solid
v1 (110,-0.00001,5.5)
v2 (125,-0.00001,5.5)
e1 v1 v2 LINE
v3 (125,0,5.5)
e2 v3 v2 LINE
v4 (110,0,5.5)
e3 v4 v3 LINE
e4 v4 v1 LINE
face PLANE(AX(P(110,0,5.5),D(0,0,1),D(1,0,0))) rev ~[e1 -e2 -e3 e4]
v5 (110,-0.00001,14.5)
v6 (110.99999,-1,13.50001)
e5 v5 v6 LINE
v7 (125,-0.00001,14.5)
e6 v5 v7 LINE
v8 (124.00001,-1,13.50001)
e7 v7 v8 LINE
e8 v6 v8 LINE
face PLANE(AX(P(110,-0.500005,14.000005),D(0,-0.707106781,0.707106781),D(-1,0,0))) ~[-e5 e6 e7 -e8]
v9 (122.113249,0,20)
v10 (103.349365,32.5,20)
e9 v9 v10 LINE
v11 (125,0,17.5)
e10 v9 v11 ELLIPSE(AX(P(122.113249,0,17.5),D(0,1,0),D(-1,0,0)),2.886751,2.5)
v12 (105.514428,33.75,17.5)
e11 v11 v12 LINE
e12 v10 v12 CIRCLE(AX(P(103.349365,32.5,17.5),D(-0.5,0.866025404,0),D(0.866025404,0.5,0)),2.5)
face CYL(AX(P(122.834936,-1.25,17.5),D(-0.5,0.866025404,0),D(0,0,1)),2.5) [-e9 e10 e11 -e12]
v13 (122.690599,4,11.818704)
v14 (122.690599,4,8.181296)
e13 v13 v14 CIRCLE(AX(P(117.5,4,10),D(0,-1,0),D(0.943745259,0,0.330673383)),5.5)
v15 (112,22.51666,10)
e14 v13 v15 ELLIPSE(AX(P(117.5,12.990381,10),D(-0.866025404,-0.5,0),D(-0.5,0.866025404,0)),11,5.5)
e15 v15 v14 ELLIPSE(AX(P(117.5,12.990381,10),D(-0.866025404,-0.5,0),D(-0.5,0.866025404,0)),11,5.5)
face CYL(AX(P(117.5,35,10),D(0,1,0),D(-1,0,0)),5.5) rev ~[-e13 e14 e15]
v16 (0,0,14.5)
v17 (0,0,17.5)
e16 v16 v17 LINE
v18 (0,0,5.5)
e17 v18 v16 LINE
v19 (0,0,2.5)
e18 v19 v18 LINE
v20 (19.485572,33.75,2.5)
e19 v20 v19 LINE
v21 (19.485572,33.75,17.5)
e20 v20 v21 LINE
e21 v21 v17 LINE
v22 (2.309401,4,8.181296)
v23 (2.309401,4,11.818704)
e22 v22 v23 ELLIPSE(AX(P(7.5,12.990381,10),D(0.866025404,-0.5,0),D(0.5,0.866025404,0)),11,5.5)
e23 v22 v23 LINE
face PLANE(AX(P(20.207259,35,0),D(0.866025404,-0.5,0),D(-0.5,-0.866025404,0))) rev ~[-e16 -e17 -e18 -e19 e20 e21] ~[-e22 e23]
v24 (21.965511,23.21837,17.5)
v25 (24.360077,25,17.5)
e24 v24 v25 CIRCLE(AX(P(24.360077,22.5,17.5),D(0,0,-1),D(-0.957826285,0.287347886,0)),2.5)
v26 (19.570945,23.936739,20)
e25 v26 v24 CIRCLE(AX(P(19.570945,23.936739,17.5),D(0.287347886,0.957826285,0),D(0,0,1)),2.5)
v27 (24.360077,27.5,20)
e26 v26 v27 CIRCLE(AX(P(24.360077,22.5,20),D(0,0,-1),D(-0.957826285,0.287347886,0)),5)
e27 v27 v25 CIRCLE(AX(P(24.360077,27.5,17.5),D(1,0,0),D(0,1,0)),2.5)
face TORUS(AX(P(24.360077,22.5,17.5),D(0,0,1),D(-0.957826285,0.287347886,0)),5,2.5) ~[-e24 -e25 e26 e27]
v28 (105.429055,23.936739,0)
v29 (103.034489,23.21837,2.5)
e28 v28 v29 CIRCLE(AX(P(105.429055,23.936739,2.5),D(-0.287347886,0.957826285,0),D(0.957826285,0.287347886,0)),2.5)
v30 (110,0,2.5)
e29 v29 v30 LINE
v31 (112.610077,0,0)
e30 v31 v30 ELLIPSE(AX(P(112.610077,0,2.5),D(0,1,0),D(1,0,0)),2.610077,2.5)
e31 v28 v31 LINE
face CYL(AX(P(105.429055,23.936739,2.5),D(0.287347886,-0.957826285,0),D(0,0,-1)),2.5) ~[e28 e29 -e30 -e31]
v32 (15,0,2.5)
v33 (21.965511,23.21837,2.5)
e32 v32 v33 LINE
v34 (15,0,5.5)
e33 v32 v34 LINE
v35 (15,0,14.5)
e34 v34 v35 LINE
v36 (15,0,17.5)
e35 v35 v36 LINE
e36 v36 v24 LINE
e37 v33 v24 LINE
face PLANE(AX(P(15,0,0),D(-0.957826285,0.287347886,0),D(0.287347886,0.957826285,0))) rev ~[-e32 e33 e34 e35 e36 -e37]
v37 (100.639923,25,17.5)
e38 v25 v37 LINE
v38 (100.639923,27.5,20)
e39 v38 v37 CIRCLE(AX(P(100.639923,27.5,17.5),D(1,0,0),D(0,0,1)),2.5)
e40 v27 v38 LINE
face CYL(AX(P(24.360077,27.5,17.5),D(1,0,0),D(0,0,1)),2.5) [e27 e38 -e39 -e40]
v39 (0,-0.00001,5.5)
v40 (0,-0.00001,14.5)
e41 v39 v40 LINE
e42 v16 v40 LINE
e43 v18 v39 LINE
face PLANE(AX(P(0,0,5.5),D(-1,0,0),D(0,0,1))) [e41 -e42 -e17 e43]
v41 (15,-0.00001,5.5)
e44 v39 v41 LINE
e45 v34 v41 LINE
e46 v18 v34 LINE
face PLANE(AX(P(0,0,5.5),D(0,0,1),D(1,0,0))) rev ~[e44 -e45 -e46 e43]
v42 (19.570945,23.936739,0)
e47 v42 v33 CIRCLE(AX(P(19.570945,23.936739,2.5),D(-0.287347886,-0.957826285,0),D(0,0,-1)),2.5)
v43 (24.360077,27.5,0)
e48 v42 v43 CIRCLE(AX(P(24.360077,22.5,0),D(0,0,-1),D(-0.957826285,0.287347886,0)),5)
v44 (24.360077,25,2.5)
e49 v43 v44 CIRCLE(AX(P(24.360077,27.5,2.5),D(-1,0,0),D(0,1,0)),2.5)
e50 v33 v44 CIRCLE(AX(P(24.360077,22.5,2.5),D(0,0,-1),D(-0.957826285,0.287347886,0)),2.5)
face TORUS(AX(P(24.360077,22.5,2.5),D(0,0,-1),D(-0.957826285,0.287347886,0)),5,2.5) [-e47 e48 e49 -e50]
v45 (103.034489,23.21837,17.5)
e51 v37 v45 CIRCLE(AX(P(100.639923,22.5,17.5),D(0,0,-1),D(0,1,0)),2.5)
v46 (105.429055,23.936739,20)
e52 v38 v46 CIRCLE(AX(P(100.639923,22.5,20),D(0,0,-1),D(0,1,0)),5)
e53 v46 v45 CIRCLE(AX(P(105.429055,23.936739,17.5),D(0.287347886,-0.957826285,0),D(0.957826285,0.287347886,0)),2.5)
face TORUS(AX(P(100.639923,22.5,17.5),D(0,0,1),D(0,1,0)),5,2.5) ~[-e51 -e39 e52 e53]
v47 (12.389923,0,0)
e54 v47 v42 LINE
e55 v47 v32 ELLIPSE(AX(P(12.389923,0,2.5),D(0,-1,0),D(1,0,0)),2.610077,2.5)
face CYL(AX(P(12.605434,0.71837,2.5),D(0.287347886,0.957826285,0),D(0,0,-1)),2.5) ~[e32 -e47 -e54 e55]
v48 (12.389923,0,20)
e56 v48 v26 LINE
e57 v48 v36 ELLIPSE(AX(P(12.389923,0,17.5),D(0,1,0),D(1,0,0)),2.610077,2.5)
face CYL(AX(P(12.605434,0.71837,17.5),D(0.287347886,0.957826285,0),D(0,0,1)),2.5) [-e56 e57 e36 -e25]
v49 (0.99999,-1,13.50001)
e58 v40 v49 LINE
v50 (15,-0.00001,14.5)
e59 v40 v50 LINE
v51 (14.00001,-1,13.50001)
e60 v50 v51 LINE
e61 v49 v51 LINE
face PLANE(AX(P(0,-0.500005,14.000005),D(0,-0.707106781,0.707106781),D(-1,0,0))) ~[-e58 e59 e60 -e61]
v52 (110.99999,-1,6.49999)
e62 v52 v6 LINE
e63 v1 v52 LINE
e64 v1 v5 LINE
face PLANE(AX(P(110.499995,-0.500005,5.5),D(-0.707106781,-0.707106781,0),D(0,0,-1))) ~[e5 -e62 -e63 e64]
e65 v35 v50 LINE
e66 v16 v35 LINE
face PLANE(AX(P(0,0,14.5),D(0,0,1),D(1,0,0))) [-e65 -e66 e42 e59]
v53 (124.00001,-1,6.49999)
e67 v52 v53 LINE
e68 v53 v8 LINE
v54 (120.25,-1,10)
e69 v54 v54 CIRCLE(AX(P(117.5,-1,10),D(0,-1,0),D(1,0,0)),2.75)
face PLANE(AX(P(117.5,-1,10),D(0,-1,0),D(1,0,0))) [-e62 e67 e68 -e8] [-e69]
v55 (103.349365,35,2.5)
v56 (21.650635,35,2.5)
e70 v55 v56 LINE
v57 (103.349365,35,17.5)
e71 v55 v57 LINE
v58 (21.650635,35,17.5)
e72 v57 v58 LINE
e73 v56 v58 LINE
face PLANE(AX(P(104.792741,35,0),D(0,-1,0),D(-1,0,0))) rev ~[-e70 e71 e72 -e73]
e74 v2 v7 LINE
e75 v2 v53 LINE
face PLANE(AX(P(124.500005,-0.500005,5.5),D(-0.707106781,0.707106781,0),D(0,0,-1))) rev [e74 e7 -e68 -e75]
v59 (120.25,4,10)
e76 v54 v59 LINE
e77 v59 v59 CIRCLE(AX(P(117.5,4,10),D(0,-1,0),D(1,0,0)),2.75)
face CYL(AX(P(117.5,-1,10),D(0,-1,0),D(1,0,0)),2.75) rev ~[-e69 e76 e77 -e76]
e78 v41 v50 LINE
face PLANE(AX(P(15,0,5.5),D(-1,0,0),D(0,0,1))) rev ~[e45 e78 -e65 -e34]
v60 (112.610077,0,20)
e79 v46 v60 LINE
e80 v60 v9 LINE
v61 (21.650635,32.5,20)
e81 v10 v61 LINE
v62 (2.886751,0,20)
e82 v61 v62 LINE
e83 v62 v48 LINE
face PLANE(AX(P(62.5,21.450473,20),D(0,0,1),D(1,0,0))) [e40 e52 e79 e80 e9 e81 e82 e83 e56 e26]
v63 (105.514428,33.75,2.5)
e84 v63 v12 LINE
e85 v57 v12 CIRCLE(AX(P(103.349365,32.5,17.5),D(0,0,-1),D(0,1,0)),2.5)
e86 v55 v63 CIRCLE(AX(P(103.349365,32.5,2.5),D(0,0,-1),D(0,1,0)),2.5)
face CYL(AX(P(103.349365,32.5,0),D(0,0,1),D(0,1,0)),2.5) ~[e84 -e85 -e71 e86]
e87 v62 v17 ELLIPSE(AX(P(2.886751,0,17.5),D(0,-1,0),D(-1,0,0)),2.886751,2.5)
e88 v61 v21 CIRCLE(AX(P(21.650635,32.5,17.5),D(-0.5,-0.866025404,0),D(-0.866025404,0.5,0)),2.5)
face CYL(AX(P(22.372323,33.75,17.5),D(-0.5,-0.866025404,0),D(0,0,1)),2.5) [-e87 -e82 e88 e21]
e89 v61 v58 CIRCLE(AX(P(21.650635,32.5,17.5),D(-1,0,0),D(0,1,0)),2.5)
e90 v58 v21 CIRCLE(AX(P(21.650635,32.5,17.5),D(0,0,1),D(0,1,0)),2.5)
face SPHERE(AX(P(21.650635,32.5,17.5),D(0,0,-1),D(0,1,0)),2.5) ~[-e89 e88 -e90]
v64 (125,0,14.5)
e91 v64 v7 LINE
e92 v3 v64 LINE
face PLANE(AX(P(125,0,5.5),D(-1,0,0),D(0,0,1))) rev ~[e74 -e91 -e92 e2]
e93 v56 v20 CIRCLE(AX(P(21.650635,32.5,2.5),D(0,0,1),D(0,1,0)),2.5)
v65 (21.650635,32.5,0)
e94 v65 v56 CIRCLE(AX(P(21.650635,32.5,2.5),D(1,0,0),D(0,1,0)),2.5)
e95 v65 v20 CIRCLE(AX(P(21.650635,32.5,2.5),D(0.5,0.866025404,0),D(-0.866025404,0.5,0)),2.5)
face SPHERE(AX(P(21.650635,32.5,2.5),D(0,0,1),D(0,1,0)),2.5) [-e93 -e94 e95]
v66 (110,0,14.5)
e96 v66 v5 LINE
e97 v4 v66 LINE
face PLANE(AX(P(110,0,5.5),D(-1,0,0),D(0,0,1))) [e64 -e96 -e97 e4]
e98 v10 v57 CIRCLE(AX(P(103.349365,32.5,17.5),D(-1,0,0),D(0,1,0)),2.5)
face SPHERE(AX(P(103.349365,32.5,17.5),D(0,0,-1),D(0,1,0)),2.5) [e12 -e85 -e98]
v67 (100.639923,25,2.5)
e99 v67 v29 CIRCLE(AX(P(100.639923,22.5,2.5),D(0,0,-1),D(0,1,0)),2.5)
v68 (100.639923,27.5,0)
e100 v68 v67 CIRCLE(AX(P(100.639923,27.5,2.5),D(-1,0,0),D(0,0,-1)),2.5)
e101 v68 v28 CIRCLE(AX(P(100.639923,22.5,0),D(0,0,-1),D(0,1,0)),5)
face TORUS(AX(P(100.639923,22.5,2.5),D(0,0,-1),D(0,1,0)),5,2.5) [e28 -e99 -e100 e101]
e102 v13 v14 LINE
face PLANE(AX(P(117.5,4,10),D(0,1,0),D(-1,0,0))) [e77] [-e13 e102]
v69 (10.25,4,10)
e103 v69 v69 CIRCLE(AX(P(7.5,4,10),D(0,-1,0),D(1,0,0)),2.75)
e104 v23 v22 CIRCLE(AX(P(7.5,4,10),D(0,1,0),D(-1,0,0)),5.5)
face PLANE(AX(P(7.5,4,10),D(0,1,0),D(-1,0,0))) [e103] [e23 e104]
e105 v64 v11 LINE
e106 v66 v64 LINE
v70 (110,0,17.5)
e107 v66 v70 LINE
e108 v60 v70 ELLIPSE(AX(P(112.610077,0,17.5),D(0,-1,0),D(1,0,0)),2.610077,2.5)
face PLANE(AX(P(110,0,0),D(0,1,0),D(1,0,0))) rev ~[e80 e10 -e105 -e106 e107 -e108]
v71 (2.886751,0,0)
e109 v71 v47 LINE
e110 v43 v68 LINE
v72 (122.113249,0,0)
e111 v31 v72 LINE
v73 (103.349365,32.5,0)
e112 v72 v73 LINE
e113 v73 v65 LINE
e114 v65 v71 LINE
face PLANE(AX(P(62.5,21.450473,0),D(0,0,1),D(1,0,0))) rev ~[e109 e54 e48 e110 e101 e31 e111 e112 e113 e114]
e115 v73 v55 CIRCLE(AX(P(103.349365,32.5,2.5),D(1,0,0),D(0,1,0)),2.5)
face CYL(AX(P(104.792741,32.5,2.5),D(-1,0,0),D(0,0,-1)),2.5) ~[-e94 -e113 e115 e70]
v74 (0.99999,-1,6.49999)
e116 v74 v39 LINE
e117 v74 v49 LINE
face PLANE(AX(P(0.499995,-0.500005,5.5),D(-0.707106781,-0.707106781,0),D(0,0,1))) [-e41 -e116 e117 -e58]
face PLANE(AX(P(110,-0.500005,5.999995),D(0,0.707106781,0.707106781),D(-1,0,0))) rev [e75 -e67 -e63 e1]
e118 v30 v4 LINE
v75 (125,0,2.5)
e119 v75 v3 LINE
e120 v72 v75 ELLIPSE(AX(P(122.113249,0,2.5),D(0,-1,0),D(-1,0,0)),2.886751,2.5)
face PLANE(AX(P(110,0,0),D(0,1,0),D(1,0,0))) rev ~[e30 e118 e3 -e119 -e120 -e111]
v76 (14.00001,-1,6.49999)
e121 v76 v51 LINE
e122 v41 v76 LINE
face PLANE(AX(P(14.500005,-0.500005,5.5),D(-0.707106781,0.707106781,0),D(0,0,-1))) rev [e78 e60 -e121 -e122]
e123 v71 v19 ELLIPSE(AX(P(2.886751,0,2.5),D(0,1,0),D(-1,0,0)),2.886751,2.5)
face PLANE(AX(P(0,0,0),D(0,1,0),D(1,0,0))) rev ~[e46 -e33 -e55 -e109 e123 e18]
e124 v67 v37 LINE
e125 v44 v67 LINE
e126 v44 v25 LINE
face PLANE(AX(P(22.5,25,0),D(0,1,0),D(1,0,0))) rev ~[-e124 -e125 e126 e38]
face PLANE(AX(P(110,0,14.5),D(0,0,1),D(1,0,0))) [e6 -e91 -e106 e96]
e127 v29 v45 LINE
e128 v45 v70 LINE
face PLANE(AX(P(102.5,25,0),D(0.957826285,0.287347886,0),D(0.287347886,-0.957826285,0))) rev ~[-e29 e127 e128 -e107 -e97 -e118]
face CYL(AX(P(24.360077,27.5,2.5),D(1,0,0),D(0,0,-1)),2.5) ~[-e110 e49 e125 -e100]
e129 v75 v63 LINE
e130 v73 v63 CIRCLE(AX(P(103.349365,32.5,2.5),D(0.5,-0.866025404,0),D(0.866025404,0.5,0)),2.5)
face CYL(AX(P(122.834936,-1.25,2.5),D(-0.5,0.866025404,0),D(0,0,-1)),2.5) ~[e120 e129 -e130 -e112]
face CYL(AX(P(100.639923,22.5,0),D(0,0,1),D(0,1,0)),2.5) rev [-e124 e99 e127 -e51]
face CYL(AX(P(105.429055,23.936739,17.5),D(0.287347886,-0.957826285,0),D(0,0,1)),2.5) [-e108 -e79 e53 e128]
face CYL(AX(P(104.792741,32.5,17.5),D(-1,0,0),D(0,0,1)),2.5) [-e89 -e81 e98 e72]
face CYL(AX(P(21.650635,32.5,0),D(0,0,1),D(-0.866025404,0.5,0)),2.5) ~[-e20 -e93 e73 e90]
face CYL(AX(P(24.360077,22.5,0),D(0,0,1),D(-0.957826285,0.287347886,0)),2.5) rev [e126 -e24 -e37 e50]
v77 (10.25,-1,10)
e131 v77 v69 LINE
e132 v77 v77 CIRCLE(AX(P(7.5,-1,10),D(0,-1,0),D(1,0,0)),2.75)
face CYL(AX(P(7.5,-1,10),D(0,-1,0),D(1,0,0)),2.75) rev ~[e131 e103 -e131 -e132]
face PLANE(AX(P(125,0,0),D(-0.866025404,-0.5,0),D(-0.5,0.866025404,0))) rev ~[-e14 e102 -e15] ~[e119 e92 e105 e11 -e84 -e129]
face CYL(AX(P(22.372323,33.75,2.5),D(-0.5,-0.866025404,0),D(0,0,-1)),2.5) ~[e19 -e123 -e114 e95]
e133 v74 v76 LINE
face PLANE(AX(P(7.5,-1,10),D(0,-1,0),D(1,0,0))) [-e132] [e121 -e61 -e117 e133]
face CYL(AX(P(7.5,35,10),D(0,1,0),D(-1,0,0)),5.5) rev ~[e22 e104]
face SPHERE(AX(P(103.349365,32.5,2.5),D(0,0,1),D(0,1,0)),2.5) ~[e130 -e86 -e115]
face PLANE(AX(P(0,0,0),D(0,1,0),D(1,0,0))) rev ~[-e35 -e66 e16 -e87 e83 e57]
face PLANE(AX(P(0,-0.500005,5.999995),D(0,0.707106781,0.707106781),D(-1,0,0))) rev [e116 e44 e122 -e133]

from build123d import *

# Parameters (mm, degrees)
F1_DEPTH = 20
F2_W     = 15
F2_H     = 9
F3_DEPTH = 1
F4_R     = 2.75
F5_DEPTH = 36.001
F6_R     = 5.5
F7_DEPTH = 31
F8_F1_R  = 2.5
F8_F2_R  = 2.5
F9_SIZE  = 0.99999


# Not quite as in the source:
# - a fillet or chamfer is up to 0.001 mm smaller than in the source, because OpenCascade refuses the exact size


with BuildPart() as f1:
    # F0 (on Top) → F1 (new body)
    with BuildSketch(Plane.XY):
        Polygon((20.2072594216, 35), (0, 0), (15, 0), (22.5, 25), (102.5, 25), (110, 0), (125, 0), (104.7927405784, 35), align=None)
    extrude(amount=F1_DEPTH)

    # F2 (on face) → F3 (join)
    with BuildSketch(Plane.XZ):
        with Locations((7.5, 10)):
            Rectangle(F2_W, F2_H)
        with Locations((117.5, 10)):
            Rectangle(F2_W, F2_H)
    extrude(amount=F3_DEPTH)

    # F4 (on face) → F5 (cut, through all)
    with BuildSketch(Plane.XZ.offset(1)):
        with Locations((7.5, 10)):
            Circle(F4_R)
        with Locations((117.5, 10)):
            Circle(F4_R)
    extrude(amount=-F5_DEPTH, mode=Mode.SUBTRACT)

    # F6 (on face) → F7 (cut)
    with BuildSketch(Plane(origin=(0, 35, 0), x_dir=(-1, 0, 0), z_dir=(0, 1, 0))):
        with Locations((-117.5, 10)):
            Circle(F6_R)
        with Locations((-7.5, 10)):
            Circle(F6_R)
    extrude(amount=-F7_DEPTH, mode=Mode.SUBTRACT)

    # F8: fillet of radius 2.5 on 12 edges, made by hand

    # F8_f1
    f8_f1_edges = [f1.edges().sort_by_distance(p)[0] for p in [
        (22.5, 25, 10),
        (102.5, 25, 10),
    ]]
    fillet(f8_f1_edges, radius=F8_F1_R)

    # F8_f2
    f8_f2_edges = [f1.edges().sort_by_distance(p)[0] for p in [
        (62.5, 25, 0),
        (62.5, 25, 20),
        (104.7927405784, 35, 10),
        (20.2072594216, 35, 10),
        (62.5, 35, 0),
        (62.5, 35, 20),
        (114.8963702892, 17.5, 20),
        (114.8963702892, 17.5, 0),
        (10.1036297108, 17.5, 20),
        (10.1036297108, 17.5, 0),
        (22.8677503031, 24.5057323207, 20),
        (102.1322496969, 24.5057323207, 20),
        (22.8677503031, 24.5057323207, 0),
        (102.1322496969, 24.5057323207, 0),
    ]]
    fillet(f8_f2_edges, radius=F8_F2_R)

    # F9 (size 1 in the source; OpenCascade refuses exactly that, so slightly less here)
    f9_edges = [f1.edges().sort_by_distance(p)[0] for p in [
        (7.5, -1, 14.5),
        (0, -1, 10),
        (7.5, -1, 5.5),
        (15, -1, 10),
        (117.5, -1, 14.5),
        (110, -1, 10),
        (117.5, -1, 5.5),
        (125, -1, 10),
    ]]
    chamfer(f9_edges, length=F9_SIZE)


solid = f1.part
